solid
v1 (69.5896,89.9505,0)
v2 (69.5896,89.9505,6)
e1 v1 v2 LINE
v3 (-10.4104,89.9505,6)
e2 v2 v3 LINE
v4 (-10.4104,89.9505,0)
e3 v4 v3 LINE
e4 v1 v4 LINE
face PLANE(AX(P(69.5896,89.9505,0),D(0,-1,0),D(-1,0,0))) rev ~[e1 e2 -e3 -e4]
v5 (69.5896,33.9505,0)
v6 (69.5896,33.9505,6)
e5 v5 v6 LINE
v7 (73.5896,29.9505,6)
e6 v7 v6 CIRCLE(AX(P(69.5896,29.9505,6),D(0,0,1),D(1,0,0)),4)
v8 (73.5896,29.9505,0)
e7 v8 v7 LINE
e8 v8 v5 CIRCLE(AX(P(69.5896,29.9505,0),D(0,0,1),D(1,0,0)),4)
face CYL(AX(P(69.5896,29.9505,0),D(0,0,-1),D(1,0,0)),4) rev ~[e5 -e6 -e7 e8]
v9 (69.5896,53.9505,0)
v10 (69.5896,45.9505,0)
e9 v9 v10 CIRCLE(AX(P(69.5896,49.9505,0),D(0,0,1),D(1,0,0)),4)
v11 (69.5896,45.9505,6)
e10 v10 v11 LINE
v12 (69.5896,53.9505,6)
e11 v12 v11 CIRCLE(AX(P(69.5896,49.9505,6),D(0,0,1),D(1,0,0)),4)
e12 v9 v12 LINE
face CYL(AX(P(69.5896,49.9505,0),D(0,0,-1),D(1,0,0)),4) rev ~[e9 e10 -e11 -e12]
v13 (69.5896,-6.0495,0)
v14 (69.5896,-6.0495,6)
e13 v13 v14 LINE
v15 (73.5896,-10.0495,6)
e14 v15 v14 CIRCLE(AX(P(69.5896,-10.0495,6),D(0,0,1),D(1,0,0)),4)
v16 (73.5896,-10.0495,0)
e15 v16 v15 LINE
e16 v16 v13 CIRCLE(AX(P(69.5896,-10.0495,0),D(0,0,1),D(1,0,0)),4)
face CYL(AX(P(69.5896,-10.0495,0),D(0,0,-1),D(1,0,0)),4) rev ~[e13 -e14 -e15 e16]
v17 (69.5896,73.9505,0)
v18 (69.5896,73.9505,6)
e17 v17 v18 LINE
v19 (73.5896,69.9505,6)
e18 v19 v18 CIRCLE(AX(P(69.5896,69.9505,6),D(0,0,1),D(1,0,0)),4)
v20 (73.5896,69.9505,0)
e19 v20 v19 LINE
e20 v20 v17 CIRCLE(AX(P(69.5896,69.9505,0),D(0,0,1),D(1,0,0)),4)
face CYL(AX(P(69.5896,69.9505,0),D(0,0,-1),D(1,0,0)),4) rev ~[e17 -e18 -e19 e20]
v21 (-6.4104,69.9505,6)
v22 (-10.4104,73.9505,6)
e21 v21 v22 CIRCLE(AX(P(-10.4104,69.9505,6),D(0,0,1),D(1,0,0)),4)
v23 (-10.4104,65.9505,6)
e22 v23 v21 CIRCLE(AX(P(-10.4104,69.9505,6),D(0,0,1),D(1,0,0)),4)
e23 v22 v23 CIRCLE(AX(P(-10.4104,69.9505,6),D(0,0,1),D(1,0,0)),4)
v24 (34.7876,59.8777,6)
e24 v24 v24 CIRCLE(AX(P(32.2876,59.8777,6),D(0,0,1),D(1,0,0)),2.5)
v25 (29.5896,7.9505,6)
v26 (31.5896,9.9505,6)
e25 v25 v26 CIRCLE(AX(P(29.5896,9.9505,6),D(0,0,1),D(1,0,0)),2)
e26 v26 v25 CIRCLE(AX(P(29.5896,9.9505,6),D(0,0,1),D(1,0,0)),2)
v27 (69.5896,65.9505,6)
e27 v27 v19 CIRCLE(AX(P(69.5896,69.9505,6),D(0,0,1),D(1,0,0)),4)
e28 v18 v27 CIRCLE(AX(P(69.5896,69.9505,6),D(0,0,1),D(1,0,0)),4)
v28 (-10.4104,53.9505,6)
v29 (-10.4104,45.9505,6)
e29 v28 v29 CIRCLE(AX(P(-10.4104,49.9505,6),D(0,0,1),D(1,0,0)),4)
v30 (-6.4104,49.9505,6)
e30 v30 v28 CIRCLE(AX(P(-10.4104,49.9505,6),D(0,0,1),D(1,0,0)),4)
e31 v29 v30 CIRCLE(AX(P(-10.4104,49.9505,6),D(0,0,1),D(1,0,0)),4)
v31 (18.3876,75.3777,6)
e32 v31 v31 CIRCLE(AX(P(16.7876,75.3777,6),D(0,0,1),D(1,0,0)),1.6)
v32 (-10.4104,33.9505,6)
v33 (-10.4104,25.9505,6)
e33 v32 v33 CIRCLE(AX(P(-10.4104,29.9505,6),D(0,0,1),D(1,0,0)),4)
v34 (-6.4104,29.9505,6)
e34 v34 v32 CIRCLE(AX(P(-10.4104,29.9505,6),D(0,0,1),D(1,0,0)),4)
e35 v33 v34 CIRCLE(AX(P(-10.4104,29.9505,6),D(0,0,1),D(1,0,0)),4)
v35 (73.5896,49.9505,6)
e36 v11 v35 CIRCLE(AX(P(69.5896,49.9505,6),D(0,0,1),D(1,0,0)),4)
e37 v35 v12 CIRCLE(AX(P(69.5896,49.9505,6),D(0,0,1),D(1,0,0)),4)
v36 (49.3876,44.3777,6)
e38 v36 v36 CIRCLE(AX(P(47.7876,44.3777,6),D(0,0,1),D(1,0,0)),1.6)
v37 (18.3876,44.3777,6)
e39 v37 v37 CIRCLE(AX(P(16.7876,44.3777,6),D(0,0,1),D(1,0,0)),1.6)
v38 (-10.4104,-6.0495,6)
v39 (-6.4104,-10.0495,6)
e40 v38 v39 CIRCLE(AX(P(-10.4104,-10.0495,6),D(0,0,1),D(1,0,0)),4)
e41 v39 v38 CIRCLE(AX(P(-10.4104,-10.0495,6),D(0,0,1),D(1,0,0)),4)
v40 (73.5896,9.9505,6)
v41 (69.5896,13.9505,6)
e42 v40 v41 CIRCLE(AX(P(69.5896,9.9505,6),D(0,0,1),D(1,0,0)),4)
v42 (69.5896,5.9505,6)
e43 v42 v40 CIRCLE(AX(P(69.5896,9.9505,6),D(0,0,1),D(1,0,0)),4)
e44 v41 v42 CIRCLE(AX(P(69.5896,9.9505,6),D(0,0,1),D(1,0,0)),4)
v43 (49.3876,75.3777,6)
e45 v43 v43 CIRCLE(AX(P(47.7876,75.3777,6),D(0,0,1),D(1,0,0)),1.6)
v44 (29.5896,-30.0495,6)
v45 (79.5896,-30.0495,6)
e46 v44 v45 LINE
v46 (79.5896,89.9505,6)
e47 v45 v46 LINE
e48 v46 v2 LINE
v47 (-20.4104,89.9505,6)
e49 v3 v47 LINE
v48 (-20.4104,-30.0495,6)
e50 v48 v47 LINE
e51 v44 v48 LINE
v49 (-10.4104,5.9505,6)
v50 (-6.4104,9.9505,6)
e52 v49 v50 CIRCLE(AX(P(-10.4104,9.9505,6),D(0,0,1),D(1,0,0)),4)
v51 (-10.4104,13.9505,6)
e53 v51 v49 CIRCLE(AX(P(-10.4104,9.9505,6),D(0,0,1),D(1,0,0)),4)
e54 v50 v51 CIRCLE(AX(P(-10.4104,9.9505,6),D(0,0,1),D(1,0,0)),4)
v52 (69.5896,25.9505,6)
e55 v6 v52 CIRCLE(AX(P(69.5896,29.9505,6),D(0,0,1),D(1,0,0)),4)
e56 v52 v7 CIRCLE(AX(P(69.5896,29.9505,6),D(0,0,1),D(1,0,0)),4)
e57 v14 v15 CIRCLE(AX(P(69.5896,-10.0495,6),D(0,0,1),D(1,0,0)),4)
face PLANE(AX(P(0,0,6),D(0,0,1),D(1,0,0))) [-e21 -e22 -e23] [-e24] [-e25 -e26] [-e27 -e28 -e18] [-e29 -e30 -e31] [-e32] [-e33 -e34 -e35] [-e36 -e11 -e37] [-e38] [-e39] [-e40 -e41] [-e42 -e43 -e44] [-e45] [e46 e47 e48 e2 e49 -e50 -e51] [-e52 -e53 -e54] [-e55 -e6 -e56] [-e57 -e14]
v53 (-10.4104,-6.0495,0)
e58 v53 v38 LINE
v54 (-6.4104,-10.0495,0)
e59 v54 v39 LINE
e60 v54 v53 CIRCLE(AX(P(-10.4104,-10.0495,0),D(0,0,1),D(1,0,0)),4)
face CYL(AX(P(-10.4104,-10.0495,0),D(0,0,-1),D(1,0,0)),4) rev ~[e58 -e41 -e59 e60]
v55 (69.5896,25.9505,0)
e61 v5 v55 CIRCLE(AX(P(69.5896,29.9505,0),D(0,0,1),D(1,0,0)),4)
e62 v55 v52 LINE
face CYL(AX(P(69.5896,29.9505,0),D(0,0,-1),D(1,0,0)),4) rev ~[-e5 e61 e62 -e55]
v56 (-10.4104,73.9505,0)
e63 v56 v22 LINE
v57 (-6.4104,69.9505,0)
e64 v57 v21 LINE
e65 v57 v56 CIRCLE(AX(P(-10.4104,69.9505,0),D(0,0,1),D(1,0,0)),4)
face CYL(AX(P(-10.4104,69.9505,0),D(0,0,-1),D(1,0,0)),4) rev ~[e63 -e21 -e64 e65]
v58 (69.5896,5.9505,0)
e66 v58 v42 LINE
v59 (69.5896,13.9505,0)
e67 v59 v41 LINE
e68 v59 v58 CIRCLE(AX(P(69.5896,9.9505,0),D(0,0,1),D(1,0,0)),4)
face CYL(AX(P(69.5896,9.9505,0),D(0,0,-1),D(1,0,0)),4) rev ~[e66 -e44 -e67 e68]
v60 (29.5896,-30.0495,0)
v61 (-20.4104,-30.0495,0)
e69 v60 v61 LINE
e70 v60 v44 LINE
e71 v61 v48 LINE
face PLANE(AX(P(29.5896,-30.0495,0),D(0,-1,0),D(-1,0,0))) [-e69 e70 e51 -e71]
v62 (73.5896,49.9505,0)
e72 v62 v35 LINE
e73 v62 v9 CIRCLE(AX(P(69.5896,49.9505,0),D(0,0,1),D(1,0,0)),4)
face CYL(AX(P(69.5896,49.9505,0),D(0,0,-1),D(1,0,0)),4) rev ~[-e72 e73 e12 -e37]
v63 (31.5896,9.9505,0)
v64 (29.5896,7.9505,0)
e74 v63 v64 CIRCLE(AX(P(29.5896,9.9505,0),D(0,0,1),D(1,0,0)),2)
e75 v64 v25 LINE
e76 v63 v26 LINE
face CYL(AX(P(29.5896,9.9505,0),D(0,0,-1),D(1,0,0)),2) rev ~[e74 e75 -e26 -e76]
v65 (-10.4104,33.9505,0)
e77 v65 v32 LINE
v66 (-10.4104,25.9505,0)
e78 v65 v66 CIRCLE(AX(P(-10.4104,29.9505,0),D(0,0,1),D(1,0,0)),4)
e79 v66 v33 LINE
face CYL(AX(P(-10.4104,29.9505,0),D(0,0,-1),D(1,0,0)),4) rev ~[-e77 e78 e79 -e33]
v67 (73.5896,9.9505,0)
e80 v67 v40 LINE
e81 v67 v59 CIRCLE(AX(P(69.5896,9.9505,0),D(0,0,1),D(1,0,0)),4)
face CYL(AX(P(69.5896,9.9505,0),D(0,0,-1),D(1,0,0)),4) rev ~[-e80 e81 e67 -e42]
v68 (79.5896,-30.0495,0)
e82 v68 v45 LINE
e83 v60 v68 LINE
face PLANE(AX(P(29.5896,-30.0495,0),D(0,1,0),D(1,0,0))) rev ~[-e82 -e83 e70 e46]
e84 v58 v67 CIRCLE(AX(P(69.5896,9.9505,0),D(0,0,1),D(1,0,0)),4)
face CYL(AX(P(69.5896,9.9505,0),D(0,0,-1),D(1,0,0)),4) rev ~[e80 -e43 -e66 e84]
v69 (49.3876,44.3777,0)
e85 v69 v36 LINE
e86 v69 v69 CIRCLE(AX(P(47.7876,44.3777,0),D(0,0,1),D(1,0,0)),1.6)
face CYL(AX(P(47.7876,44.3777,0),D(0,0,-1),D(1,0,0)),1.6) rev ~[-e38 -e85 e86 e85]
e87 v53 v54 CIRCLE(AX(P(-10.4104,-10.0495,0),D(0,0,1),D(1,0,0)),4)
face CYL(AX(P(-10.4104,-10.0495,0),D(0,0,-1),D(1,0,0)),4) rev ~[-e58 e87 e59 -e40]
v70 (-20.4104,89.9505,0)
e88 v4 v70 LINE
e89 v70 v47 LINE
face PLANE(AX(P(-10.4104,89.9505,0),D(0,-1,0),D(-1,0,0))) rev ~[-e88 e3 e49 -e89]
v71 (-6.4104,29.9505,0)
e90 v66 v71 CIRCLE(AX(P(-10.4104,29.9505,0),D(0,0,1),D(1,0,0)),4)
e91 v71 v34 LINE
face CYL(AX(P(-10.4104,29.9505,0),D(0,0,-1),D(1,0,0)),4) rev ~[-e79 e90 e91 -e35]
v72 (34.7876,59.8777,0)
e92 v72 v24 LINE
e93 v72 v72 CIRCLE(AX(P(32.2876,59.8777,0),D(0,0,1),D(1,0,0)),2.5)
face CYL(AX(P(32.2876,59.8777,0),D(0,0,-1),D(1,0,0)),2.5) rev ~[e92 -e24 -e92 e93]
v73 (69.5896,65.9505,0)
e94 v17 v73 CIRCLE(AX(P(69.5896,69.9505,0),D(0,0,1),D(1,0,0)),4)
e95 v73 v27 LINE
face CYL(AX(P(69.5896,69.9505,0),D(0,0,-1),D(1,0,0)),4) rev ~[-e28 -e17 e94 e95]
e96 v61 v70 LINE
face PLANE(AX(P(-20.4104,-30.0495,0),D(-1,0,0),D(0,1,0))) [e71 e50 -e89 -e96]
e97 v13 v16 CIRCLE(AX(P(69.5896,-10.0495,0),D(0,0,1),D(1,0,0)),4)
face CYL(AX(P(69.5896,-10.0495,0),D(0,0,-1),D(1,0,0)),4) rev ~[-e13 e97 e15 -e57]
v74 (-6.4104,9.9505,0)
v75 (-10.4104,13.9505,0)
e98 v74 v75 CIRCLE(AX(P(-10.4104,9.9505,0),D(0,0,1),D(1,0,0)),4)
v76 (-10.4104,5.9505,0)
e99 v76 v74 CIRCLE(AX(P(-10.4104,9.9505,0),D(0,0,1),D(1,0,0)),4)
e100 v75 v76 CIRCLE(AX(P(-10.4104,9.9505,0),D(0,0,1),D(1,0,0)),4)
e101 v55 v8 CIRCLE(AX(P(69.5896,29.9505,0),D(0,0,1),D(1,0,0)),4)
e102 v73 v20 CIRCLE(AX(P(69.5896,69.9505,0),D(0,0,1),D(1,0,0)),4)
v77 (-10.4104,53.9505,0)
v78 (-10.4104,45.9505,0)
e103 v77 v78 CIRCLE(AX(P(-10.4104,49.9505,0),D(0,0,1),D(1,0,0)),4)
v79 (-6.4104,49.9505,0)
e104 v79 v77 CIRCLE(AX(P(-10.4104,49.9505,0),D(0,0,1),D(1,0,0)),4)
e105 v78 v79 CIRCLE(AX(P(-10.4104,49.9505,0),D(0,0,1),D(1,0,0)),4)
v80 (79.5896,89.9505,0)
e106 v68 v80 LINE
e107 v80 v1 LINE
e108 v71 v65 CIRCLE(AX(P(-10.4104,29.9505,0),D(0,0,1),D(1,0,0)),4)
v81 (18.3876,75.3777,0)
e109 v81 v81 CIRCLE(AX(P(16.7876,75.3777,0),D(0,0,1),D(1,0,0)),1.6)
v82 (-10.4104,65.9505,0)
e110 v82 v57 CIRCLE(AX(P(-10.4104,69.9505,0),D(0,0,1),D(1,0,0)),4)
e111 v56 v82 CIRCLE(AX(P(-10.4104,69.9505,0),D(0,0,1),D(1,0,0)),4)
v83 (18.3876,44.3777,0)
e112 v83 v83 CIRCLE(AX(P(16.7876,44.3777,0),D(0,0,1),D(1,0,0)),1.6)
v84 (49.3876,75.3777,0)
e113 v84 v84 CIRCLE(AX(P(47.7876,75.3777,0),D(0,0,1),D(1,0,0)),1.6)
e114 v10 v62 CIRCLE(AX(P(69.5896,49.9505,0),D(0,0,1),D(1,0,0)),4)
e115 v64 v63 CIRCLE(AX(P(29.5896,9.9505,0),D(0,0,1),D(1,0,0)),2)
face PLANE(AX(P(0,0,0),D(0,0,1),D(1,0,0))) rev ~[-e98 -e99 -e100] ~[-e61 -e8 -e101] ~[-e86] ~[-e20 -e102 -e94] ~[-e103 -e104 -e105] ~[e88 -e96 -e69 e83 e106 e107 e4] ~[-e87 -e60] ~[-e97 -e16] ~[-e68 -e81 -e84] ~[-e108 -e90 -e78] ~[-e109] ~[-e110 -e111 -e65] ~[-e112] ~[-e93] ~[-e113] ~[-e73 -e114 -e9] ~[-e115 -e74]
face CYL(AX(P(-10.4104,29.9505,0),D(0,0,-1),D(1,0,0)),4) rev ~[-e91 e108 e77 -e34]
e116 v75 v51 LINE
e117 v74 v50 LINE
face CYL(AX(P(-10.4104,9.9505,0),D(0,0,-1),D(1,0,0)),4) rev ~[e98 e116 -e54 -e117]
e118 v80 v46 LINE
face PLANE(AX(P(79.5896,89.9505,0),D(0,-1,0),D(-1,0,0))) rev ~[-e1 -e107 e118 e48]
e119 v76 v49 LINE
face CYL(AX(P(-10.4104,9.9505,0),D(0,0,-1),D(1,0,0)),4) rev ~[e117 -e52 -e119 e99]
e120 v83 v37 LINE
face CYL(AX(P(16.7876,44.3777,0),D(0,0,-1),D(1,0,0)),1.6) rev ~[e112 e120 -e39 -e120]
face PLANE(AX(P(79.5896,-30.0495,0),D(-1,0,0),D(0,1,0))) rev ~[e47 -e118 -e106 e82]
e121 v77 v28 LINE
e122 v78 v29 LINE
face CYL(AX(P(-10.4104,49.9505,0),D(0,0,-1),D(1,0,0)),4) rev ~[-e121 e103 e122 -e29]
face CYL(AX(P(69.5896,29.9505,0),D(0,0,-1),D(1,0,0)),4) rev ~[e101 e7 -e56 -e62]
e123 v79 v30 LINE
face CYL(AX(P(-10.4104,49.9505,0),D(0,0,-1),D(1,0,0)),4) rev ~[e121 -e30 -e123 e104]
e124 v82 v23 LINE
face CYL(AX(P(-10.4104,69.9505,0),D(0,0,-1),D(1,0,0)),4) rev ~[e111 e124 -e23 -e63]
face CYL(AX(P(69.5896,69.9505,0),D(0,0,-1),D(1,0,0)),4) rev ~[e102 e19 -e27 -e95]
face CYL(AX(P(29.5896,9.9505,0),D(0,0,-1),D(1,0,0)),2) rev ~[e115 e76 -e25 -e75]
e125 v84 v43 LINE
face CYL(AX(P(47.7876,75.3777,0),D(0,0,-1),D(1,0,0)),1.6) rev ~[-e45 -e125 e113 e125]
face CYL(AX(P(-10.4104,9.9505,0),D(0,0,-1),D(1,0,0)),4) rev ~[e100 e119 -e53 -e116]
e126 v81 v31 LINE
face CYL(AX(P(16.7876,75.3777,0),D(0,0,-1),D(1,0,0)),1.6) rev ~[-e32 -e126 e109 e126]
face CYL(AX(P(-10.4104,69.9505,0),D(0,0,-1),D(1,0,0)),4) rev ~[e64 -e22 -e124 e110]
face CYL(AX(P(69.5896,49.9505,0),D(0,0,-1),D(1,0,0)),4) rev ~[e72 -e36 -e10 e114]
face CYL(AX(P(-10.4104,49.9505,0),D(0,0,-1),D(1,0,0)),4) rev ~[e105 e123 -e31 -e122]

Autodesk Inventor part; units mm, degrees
ref_plane "YZ Plane" through (0, 0, 0) normal (1, 0, 0) x (0, 1, 0)
ref_plane "XZ Plane" through (0, 0, 0) normal (0, 1, 0) x (-1, 0, 0)
ref_plane "XY Plane" through (0, 0, 0) normal (0, 0, 1) x (1, 0, 0)
ref_plane "Work Plane1" through (0, 0, 0) normal (0, 0, 1) x (1, 0, 0)
sketch "Sketch1" plane through (0, 0, 0) normal (0, 0, 1) x (1, 0, 0)
  circle A0 centre (29.5896, 9.9505) radius 2
  circle A1 centre (32.2876, 59.8777) radius 2.5
  line L0 (29.5896, 9.9505) -> (29.5896, -30.0495)
  line L1 (29.5896, -30.0495) -> (79.5896, -30.0495)
  line L2 (79.5896, -30.0495) -> (79.5896, 89.9505)
  line L3 (79.5896, 89.9505) -> (-20.4104, 89.9505)
  line L4 (-20.4104, 89.9505) -> (79.5896, 89.9505)
  line L5 (79.5896, 89.9505) -> (79.5896, -30.0495)
  line L6 (79.5896, -30.0495) -> (-20.4104, -30.0495)
  line L7 (-20.4104, -30.0495) -> (-20.4104, 89.9505)
  circle A2 centre (16.7876, 75.3777) radius 1.6
  circle A3 centre (47.7876, 75.3777) radius 1.6
  circle A4 centre (47.7876, 44.3777) radius 1.6
  circle A5 centre (16.7876, 44.3777) radius 1.6
  line L8 (-20.4104, 89.9505) -> (-10.4104, 89.9505)
  line L9 (-10.4104, 89.9505) -> (-10.4104, 69.9505)
  line L10 (-10.4104, 69.9505) -> (-10.4104, 49.9505)
  line L11 (-10.4104, 49.9505) -> (-10.4104, 29.9505)
  line L12 (-10.4104, 29.9505) -> (-10.4104, 9.9505)
  line L13 (-10.4104, 9.9505) -> (-10.4104, -10.0495)
  line L14 (79.5896, 89.9505) -> (69.5896, 89.9505)
  line L15 (69.5896, 89.9505) -> (69.5896, 69.9505)
  line L16 (69.5896, 69.9505) -> (69.5896, 49.9505)
  line L17 (69.5896, 49.9505) -> (69.5896, 29.9505)
  line L18 (69.5896, 29.9505) -> (69.5896, 9.9505)
  line L19 (69.5896, 9.9505) -> (69.5896, -10.0495)
  circle A6 centre (-10.4104, 69.9505) radius 4
  circle A7 centre (-10.4104, 49.9505) radius 4
  circle A8 centre (-10.4104, 29.9505) radius 4
  circle A9 centre (-10.4104, 9.9505) radius 4
  circle A10 centre (-10.4104, -10.0495) radius 4
  circle A11 centre (69.5896, 69.9505) radius 4
  circle A12 centre (69.5896, 49.9505) radius 4
  circle A13 centre (69.5896, 29.9505) radius 4
  circle A14 centre (69.5896, 9.9505) radius 4
  circle A15 centre (69.5896, -10.0495) radius 4
  dimension "d0" = 4
  dimension "d1" = 5
  dimension "d2" = 40
  dimension "d3" = 50
  dimension "d4" = 120
  dimension "d5" = 100
  dimension "d6" = 3.2
  dimension "d7" = 3.2
  dimension "d8" = 3.2
  dimension "d9" = 3.2
  dimension "d10" = 10
  dimension "d11" = 20
  dimension "d12" = 20
  dimension "d13" = 20
  dimension "d14" = 20
  dimension "d15" = 20
  dimension "d16" = 10
  dimension "d17" = 20
  dimension "d18" = 20
  dimension "d19" = 20
  dimension "d20" = 20
  dimension "d21" = 20
  dimension "d22" = 8
  dimension "d23" = 8
  dimension "d24" = 8
  dimension "d25" = 8
  dimension "d26" = 8
  dimension "d27" = 8
  dimension "d28" = 8
  dimension "d29" = 8
  dimension "d30" = 8
  dimension "d31" = 8
extrude "Extrusion1" add sketch "Sketch1" along normal blind 6
properties part number "motor_gear_holder"
